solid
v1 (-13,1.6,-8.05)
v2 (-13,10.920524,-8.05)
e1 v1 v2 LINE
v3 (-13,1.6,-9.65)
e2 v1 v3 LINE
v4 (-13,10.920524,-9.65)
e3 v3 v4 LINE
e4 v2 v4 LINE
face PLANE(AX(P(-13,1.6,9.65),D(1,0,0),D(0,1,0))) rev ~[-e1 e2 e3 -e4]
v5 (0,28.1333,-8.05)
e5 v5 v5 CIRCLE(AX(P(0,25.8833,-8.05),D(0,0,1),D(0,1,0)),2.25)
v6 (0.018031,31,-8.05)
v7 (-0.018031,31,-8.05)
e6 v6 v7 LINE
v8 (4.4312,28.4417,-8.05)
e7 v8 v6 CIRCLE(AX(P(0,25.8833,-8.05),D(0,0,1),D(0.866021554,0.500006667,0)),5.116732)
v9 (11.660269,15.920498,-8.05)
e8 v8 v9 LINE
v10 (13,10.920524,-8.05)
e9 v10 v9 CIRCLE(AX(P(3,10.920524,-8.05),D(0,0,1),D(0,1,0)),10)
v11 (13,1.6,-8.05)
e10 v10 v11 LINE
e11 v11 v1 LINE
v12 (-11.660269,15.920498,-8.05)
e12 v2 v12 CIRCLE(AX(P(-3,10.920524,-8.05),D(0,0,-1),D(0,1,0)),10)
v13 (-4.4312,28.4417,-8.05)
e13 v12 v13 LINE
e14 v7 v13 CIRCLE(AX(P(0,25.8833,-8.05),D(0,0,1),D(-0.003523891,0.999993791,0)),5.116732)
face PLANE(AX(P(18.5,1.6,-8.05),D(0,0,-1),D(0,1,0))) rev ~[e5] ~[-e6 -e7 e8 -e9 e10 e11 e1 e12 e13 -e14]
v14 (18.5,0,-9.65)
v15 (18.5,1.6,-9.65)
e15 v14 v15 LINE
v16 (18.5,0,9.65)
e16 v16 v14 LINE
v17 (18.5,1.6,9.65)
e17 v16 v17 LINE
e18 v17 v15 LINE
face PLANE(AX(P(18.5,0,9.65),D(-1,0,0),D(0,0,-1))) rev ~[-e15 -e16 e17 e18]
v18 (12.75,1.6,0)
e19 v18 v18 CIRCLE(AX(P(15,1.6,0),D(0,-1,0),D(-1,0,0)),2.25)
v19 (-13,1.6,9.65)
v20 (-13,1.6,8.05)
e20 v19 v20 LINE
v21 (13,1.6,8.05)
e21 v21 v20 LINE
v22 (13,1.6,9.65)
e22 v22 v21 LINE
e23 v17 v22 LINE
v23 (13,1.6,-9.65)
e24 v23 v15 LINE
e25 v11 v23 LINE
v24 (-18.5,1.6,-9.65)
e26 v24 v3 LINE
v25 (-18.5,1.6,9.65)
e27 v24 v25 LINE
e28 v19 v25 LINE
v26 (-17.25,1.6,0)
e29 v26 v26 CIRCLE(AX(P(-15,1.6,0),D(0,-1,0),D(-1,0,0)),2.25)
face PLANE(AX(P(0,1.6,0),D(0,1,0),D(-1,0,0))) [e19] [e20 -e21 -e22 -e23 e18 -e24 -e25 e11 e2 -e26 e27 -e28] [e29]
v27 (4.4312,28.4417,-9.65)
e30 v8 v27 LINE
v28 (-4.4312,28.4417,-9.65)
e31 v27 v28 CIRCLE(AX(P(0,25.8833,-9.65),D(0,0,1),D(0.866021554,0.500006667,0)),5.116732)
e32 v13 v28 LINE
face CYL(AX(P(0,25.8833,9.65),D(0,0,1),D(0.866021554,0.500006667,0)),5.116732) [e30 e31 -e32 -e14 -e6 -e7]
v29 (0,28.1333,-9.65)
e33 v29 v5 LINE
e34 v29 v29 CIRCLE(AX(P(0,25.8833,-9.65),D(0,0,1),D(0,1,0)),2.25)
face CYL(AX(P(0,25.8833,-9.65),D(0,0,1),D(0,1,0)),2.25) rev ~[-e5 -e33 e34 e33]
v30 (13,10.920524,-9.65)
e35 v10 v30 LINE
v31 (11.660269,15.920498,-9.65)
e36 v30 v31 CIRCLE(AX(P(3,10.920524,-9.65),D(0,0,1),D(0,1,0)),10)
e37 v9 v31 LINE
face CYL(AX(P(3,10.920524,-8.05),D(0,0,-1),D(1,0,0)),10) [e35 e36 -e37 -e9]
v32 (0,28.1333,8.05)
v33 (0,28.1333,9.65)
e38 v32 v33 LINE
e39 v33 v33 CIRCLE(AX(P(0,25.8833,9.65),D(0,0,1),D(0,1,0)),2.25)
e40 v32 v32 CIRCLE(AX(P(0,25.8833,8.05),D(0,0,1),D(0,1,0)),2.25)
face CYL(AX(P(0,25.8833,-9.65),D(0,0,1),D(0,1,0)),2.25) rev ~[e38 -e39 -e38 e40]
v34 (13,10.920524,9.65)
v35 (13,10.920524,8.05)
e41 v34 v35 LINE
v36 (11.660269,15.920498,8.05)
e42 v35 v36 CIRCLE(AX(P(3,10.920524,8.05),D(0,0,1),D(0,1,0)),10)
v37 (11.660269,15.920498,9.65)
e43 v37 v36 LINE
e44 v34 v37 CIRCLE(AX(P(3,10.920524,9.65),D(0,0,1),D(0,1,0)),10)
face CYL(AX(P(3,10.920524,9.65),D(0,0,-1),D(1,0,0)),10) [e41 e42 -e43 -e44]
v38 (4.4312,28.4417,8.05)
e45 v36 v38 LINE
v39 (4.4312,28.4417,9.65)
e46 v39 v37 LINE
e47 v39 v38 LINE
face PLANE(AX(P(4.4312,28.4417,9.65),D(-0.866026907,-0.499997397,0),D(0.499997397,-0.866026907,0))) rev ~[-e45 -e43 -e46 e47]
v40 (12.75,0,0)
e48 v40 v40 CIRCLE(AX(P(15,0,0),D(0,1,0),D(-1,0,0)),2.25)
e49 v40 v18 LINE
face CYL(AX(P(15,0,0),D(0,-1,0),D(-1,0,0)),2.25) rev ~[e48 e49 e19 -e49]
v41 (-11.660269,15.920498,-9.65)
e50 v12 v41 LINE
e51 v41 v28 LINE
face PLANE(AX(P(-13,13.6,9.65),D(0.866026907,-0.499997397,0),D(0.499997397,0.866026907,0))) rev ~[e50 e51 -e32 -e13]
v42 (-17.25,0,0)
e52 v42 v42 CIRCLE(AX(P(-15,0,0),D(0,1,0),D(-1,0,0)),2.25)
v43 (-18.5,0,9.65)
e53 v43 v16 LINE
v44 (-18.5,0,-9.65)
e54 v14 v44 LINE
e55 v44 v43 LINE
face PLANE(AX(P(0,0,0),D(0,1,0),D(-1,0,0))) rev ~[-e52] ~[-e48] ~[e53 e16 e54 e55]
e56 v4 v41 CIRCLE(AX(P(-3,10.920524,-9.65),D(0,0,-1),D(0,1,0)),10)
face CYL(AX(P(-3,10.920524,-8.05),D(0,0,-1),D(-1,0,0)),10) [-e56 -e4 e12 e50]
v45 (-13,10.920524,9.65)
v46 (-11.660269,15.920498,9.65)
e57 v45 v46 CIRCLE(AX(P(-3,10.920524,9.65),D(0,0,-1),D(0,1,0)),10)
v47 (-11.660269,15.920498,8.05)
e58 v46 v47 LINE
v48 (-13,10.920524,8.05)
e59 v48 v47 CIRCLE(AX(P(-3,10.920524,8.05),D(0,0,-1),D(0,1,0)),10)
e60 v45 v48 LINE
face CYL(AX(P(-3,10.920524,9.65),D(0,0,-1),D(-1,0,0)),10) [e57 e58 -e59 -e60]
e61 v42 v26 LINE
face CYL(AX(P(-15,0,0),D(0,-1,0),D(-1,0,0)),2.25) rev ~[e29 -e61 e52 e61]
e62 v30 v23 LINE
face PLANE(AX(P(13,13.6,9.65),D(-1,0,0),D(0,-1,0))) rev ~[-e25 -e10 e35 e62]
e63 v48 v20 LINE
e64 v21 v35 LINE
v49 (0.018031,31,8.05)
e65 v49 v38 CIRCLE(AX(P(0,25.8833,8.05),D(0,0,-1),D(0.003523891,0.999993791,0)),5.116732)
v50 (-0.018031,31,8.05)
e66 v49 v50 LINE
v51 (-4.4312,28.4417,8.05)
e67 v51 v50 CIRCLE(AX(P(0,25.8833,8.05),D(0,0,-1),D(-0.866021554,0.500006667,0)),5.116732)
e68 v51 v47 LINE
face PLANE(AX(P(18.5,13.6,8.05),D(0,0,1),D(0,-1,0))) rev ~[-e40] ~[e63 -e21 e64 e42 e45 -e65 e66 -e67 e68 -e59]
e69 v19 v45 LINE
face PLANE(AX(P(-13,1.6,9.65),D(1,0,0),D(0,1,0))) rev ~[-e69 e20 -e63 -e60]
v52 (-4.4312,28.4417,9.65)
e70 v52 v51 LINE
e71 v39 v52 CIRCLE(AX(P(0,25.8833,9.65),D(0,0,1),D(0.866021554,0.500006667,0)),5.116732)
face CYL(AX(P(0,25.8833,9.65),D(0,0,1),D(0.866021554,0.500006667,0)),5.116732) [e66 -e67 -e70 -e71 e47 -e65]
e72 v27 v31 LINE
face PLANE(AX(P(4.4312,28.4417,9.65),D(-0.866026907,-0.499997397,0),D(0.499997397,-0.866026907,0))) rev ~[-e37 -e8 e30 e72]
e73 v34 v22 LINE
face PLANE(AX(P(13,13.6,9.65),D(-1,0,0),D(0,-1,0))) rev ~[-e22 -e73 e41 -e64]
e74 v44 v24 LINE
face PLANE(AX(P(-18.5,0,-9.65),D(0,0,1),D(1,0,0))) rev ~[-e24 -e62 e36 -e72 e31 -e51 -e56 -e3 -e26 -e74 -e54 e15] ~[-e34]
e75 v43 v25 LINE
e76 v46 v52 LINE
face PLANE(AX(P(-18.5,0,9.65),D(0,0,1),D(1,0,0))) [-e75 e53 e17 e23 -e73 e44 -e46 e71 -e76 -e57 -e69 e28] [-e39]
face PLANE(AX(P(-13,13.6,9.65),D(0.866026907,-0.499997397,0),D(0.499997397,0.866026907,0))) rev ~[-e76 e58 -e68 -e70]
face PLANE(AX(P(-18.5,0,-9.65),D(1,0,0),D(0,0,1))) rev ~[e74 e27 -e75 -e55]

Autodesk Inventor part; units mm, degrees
ref_plane "YZ Plane" through (0, 0, 0) normal (1, 0, 0) x (0, 1, 0)
ref_plane "XZ Plane" through (0, 0, 0) normal (0, 1, 0) x (-1, 0, 0)
ref_plane "XY Plane" through (0, 0, 0) normal (0, 0, 1) x (1, 0, 0)
sketch "スケッチ1" plane through (0, 0, 0) normal (0, 1, 0) x (-1, 0, 0)
  line L0 (18.5, 9.65) -> (-18.5, 9.65)
  line L1 (-18.5, 9.65) -> (-18.5, -9.65)
  line L2 (-18.5, -9.65) -> (18.5, -9.65)
  line L3 (18.5, -9.65) -> (18.5, 9.65)
  line L4 (0, 9.65) -> (0, -9.65)
  circle A0 centre (15, 0) radius 2.25
  circle A1 centre (-15, 0) radius 2.25
  point P0 (0, 0)
  point P1 (-15, 0)
  point P2 (0, 0)
  dimension "d0" = 37
  dimension "d1" = 19.3
  dimension "d2" = 30
  dimension "d3" = 4.5
extrude "押し出し1" add sketch "スケッチ1" along normal blind 1.6
sketch "スケッチ2" plane through (-18.5, 0, 9.65) normal (0, 0, 1) x (1, 0, 0)
  line L0 (0, 0) -> (0, 1.6) projected
  line L1 (5.5, 1.6) -> (5.5, 13.6)
  line L2 (5.5, 13.6) -> (14.0688, 28.4417)
  line L3 (22.9312, 28.4417) -> (31.5, 13.6)
  line L4 (31.5, 13.6) -> (31.5, 1.6)
  line L5 (13.6056, 31) -> (23.0857, 31) construction
  line L6 (0, 0) -> (37, 0) projected
  arc A0 (22.9312, 28.4417) -> (14.0688, 28.4417) centre (18.5, 25.8833) ccw
  line L7 (37, 0) -> (37, 1.6) projected
  line L8 (0, 1.6) -> (37, 1.6) construction
  line L9 (31.5, 1.6) -> (37, 1.6) construction
  line L10 (5.5, 1.6) -> (0, 1.6) construction
  line L11 (5.5, 1.6) -> (31.5, 1.6)
  point P0 (18.5, 0)
  point P1 (18.5, 35.8969)
  point P2 (18.5, 0)
  dimension "d6" = 12
  dimension "d7" = 31
  dimension "d14" = 26
  dimension "d15" = 60
extrude "押し出し2" add sketch "スケッチ2" against normal up to surface (19.3 mm away)
sketch "スケッチ3" plane through (18.5, 0, 9.65) normal (1, 0, 0) x (0, 0, -1)
  line L0 (0, 13.6) -> (0, 28.4417) projected
  line L1 (0, 0) -> (0, 1.6) projected
  line L2 (0, 0) -> (19.3, 0) projected
  line L3 (19.3, 0) -> (19.3, 1.6) projected
  line L4 (19.3, 13.6) -> (19.3, 28.4417) projected
  line L5 (19.3, 31) -> (19.3, 28.4417) projected
  line L6 (0, 31) -> (0, 28.4417) projected
  line L7 (1.6, 31) -> (1.6, 28.6547)
  line L8 (1.6, 28.6547) -> (1.6, 13.6)
  line L9 (1.6, 13.6) -> (1.6, 1.6)
  line L10 (1.6, 1.6) -> (17.7, 1.6)
  line L11 (17.7, 1.6) -> (17.7, 13.6)
  line L12 (17.7, 13.6) -> (17.7, 28.6547)
  line L13 (17.7, 28.6547) -> (17.7, 31)
  line L14 (1.6, 31) -> (17.7, 31)
  line L15 (0, 31) -> (19.3, 31) projected
  point P0 (9.65, 0)
  dimension "d10" = 1.6
extrude "押し出し3" cut sketch "スケッチ3" against normal through all
fillet "フィレット1" radius 10 4 edges at (13, 13.6, 8.85) (13, 13.6, -8.85) (-13, 13.6, -8.85) (-13, 13.6, 8.85)
sketch "スケッチ4" plane through (18.5, 0, -9.65) normal (0, 0, -1) x (-1, 0, 0)
  arc A0 (22.9312, 28.4417) -> (14.0688, 28.4417) centre (18.5, 25.8833) ccw projected
  point P0 (18.5, 0)
hole "穴1" at (0, 25.8833, -9.65) direction (0, 0, 1) diameter 4.5 depth 19.3
ref_plane "作業平面1" through (18.5, 0, 0) normal (0, 0, -1) x (-1, 0, 0)
properties part number "mounter" material "アルミニウム 6061"
